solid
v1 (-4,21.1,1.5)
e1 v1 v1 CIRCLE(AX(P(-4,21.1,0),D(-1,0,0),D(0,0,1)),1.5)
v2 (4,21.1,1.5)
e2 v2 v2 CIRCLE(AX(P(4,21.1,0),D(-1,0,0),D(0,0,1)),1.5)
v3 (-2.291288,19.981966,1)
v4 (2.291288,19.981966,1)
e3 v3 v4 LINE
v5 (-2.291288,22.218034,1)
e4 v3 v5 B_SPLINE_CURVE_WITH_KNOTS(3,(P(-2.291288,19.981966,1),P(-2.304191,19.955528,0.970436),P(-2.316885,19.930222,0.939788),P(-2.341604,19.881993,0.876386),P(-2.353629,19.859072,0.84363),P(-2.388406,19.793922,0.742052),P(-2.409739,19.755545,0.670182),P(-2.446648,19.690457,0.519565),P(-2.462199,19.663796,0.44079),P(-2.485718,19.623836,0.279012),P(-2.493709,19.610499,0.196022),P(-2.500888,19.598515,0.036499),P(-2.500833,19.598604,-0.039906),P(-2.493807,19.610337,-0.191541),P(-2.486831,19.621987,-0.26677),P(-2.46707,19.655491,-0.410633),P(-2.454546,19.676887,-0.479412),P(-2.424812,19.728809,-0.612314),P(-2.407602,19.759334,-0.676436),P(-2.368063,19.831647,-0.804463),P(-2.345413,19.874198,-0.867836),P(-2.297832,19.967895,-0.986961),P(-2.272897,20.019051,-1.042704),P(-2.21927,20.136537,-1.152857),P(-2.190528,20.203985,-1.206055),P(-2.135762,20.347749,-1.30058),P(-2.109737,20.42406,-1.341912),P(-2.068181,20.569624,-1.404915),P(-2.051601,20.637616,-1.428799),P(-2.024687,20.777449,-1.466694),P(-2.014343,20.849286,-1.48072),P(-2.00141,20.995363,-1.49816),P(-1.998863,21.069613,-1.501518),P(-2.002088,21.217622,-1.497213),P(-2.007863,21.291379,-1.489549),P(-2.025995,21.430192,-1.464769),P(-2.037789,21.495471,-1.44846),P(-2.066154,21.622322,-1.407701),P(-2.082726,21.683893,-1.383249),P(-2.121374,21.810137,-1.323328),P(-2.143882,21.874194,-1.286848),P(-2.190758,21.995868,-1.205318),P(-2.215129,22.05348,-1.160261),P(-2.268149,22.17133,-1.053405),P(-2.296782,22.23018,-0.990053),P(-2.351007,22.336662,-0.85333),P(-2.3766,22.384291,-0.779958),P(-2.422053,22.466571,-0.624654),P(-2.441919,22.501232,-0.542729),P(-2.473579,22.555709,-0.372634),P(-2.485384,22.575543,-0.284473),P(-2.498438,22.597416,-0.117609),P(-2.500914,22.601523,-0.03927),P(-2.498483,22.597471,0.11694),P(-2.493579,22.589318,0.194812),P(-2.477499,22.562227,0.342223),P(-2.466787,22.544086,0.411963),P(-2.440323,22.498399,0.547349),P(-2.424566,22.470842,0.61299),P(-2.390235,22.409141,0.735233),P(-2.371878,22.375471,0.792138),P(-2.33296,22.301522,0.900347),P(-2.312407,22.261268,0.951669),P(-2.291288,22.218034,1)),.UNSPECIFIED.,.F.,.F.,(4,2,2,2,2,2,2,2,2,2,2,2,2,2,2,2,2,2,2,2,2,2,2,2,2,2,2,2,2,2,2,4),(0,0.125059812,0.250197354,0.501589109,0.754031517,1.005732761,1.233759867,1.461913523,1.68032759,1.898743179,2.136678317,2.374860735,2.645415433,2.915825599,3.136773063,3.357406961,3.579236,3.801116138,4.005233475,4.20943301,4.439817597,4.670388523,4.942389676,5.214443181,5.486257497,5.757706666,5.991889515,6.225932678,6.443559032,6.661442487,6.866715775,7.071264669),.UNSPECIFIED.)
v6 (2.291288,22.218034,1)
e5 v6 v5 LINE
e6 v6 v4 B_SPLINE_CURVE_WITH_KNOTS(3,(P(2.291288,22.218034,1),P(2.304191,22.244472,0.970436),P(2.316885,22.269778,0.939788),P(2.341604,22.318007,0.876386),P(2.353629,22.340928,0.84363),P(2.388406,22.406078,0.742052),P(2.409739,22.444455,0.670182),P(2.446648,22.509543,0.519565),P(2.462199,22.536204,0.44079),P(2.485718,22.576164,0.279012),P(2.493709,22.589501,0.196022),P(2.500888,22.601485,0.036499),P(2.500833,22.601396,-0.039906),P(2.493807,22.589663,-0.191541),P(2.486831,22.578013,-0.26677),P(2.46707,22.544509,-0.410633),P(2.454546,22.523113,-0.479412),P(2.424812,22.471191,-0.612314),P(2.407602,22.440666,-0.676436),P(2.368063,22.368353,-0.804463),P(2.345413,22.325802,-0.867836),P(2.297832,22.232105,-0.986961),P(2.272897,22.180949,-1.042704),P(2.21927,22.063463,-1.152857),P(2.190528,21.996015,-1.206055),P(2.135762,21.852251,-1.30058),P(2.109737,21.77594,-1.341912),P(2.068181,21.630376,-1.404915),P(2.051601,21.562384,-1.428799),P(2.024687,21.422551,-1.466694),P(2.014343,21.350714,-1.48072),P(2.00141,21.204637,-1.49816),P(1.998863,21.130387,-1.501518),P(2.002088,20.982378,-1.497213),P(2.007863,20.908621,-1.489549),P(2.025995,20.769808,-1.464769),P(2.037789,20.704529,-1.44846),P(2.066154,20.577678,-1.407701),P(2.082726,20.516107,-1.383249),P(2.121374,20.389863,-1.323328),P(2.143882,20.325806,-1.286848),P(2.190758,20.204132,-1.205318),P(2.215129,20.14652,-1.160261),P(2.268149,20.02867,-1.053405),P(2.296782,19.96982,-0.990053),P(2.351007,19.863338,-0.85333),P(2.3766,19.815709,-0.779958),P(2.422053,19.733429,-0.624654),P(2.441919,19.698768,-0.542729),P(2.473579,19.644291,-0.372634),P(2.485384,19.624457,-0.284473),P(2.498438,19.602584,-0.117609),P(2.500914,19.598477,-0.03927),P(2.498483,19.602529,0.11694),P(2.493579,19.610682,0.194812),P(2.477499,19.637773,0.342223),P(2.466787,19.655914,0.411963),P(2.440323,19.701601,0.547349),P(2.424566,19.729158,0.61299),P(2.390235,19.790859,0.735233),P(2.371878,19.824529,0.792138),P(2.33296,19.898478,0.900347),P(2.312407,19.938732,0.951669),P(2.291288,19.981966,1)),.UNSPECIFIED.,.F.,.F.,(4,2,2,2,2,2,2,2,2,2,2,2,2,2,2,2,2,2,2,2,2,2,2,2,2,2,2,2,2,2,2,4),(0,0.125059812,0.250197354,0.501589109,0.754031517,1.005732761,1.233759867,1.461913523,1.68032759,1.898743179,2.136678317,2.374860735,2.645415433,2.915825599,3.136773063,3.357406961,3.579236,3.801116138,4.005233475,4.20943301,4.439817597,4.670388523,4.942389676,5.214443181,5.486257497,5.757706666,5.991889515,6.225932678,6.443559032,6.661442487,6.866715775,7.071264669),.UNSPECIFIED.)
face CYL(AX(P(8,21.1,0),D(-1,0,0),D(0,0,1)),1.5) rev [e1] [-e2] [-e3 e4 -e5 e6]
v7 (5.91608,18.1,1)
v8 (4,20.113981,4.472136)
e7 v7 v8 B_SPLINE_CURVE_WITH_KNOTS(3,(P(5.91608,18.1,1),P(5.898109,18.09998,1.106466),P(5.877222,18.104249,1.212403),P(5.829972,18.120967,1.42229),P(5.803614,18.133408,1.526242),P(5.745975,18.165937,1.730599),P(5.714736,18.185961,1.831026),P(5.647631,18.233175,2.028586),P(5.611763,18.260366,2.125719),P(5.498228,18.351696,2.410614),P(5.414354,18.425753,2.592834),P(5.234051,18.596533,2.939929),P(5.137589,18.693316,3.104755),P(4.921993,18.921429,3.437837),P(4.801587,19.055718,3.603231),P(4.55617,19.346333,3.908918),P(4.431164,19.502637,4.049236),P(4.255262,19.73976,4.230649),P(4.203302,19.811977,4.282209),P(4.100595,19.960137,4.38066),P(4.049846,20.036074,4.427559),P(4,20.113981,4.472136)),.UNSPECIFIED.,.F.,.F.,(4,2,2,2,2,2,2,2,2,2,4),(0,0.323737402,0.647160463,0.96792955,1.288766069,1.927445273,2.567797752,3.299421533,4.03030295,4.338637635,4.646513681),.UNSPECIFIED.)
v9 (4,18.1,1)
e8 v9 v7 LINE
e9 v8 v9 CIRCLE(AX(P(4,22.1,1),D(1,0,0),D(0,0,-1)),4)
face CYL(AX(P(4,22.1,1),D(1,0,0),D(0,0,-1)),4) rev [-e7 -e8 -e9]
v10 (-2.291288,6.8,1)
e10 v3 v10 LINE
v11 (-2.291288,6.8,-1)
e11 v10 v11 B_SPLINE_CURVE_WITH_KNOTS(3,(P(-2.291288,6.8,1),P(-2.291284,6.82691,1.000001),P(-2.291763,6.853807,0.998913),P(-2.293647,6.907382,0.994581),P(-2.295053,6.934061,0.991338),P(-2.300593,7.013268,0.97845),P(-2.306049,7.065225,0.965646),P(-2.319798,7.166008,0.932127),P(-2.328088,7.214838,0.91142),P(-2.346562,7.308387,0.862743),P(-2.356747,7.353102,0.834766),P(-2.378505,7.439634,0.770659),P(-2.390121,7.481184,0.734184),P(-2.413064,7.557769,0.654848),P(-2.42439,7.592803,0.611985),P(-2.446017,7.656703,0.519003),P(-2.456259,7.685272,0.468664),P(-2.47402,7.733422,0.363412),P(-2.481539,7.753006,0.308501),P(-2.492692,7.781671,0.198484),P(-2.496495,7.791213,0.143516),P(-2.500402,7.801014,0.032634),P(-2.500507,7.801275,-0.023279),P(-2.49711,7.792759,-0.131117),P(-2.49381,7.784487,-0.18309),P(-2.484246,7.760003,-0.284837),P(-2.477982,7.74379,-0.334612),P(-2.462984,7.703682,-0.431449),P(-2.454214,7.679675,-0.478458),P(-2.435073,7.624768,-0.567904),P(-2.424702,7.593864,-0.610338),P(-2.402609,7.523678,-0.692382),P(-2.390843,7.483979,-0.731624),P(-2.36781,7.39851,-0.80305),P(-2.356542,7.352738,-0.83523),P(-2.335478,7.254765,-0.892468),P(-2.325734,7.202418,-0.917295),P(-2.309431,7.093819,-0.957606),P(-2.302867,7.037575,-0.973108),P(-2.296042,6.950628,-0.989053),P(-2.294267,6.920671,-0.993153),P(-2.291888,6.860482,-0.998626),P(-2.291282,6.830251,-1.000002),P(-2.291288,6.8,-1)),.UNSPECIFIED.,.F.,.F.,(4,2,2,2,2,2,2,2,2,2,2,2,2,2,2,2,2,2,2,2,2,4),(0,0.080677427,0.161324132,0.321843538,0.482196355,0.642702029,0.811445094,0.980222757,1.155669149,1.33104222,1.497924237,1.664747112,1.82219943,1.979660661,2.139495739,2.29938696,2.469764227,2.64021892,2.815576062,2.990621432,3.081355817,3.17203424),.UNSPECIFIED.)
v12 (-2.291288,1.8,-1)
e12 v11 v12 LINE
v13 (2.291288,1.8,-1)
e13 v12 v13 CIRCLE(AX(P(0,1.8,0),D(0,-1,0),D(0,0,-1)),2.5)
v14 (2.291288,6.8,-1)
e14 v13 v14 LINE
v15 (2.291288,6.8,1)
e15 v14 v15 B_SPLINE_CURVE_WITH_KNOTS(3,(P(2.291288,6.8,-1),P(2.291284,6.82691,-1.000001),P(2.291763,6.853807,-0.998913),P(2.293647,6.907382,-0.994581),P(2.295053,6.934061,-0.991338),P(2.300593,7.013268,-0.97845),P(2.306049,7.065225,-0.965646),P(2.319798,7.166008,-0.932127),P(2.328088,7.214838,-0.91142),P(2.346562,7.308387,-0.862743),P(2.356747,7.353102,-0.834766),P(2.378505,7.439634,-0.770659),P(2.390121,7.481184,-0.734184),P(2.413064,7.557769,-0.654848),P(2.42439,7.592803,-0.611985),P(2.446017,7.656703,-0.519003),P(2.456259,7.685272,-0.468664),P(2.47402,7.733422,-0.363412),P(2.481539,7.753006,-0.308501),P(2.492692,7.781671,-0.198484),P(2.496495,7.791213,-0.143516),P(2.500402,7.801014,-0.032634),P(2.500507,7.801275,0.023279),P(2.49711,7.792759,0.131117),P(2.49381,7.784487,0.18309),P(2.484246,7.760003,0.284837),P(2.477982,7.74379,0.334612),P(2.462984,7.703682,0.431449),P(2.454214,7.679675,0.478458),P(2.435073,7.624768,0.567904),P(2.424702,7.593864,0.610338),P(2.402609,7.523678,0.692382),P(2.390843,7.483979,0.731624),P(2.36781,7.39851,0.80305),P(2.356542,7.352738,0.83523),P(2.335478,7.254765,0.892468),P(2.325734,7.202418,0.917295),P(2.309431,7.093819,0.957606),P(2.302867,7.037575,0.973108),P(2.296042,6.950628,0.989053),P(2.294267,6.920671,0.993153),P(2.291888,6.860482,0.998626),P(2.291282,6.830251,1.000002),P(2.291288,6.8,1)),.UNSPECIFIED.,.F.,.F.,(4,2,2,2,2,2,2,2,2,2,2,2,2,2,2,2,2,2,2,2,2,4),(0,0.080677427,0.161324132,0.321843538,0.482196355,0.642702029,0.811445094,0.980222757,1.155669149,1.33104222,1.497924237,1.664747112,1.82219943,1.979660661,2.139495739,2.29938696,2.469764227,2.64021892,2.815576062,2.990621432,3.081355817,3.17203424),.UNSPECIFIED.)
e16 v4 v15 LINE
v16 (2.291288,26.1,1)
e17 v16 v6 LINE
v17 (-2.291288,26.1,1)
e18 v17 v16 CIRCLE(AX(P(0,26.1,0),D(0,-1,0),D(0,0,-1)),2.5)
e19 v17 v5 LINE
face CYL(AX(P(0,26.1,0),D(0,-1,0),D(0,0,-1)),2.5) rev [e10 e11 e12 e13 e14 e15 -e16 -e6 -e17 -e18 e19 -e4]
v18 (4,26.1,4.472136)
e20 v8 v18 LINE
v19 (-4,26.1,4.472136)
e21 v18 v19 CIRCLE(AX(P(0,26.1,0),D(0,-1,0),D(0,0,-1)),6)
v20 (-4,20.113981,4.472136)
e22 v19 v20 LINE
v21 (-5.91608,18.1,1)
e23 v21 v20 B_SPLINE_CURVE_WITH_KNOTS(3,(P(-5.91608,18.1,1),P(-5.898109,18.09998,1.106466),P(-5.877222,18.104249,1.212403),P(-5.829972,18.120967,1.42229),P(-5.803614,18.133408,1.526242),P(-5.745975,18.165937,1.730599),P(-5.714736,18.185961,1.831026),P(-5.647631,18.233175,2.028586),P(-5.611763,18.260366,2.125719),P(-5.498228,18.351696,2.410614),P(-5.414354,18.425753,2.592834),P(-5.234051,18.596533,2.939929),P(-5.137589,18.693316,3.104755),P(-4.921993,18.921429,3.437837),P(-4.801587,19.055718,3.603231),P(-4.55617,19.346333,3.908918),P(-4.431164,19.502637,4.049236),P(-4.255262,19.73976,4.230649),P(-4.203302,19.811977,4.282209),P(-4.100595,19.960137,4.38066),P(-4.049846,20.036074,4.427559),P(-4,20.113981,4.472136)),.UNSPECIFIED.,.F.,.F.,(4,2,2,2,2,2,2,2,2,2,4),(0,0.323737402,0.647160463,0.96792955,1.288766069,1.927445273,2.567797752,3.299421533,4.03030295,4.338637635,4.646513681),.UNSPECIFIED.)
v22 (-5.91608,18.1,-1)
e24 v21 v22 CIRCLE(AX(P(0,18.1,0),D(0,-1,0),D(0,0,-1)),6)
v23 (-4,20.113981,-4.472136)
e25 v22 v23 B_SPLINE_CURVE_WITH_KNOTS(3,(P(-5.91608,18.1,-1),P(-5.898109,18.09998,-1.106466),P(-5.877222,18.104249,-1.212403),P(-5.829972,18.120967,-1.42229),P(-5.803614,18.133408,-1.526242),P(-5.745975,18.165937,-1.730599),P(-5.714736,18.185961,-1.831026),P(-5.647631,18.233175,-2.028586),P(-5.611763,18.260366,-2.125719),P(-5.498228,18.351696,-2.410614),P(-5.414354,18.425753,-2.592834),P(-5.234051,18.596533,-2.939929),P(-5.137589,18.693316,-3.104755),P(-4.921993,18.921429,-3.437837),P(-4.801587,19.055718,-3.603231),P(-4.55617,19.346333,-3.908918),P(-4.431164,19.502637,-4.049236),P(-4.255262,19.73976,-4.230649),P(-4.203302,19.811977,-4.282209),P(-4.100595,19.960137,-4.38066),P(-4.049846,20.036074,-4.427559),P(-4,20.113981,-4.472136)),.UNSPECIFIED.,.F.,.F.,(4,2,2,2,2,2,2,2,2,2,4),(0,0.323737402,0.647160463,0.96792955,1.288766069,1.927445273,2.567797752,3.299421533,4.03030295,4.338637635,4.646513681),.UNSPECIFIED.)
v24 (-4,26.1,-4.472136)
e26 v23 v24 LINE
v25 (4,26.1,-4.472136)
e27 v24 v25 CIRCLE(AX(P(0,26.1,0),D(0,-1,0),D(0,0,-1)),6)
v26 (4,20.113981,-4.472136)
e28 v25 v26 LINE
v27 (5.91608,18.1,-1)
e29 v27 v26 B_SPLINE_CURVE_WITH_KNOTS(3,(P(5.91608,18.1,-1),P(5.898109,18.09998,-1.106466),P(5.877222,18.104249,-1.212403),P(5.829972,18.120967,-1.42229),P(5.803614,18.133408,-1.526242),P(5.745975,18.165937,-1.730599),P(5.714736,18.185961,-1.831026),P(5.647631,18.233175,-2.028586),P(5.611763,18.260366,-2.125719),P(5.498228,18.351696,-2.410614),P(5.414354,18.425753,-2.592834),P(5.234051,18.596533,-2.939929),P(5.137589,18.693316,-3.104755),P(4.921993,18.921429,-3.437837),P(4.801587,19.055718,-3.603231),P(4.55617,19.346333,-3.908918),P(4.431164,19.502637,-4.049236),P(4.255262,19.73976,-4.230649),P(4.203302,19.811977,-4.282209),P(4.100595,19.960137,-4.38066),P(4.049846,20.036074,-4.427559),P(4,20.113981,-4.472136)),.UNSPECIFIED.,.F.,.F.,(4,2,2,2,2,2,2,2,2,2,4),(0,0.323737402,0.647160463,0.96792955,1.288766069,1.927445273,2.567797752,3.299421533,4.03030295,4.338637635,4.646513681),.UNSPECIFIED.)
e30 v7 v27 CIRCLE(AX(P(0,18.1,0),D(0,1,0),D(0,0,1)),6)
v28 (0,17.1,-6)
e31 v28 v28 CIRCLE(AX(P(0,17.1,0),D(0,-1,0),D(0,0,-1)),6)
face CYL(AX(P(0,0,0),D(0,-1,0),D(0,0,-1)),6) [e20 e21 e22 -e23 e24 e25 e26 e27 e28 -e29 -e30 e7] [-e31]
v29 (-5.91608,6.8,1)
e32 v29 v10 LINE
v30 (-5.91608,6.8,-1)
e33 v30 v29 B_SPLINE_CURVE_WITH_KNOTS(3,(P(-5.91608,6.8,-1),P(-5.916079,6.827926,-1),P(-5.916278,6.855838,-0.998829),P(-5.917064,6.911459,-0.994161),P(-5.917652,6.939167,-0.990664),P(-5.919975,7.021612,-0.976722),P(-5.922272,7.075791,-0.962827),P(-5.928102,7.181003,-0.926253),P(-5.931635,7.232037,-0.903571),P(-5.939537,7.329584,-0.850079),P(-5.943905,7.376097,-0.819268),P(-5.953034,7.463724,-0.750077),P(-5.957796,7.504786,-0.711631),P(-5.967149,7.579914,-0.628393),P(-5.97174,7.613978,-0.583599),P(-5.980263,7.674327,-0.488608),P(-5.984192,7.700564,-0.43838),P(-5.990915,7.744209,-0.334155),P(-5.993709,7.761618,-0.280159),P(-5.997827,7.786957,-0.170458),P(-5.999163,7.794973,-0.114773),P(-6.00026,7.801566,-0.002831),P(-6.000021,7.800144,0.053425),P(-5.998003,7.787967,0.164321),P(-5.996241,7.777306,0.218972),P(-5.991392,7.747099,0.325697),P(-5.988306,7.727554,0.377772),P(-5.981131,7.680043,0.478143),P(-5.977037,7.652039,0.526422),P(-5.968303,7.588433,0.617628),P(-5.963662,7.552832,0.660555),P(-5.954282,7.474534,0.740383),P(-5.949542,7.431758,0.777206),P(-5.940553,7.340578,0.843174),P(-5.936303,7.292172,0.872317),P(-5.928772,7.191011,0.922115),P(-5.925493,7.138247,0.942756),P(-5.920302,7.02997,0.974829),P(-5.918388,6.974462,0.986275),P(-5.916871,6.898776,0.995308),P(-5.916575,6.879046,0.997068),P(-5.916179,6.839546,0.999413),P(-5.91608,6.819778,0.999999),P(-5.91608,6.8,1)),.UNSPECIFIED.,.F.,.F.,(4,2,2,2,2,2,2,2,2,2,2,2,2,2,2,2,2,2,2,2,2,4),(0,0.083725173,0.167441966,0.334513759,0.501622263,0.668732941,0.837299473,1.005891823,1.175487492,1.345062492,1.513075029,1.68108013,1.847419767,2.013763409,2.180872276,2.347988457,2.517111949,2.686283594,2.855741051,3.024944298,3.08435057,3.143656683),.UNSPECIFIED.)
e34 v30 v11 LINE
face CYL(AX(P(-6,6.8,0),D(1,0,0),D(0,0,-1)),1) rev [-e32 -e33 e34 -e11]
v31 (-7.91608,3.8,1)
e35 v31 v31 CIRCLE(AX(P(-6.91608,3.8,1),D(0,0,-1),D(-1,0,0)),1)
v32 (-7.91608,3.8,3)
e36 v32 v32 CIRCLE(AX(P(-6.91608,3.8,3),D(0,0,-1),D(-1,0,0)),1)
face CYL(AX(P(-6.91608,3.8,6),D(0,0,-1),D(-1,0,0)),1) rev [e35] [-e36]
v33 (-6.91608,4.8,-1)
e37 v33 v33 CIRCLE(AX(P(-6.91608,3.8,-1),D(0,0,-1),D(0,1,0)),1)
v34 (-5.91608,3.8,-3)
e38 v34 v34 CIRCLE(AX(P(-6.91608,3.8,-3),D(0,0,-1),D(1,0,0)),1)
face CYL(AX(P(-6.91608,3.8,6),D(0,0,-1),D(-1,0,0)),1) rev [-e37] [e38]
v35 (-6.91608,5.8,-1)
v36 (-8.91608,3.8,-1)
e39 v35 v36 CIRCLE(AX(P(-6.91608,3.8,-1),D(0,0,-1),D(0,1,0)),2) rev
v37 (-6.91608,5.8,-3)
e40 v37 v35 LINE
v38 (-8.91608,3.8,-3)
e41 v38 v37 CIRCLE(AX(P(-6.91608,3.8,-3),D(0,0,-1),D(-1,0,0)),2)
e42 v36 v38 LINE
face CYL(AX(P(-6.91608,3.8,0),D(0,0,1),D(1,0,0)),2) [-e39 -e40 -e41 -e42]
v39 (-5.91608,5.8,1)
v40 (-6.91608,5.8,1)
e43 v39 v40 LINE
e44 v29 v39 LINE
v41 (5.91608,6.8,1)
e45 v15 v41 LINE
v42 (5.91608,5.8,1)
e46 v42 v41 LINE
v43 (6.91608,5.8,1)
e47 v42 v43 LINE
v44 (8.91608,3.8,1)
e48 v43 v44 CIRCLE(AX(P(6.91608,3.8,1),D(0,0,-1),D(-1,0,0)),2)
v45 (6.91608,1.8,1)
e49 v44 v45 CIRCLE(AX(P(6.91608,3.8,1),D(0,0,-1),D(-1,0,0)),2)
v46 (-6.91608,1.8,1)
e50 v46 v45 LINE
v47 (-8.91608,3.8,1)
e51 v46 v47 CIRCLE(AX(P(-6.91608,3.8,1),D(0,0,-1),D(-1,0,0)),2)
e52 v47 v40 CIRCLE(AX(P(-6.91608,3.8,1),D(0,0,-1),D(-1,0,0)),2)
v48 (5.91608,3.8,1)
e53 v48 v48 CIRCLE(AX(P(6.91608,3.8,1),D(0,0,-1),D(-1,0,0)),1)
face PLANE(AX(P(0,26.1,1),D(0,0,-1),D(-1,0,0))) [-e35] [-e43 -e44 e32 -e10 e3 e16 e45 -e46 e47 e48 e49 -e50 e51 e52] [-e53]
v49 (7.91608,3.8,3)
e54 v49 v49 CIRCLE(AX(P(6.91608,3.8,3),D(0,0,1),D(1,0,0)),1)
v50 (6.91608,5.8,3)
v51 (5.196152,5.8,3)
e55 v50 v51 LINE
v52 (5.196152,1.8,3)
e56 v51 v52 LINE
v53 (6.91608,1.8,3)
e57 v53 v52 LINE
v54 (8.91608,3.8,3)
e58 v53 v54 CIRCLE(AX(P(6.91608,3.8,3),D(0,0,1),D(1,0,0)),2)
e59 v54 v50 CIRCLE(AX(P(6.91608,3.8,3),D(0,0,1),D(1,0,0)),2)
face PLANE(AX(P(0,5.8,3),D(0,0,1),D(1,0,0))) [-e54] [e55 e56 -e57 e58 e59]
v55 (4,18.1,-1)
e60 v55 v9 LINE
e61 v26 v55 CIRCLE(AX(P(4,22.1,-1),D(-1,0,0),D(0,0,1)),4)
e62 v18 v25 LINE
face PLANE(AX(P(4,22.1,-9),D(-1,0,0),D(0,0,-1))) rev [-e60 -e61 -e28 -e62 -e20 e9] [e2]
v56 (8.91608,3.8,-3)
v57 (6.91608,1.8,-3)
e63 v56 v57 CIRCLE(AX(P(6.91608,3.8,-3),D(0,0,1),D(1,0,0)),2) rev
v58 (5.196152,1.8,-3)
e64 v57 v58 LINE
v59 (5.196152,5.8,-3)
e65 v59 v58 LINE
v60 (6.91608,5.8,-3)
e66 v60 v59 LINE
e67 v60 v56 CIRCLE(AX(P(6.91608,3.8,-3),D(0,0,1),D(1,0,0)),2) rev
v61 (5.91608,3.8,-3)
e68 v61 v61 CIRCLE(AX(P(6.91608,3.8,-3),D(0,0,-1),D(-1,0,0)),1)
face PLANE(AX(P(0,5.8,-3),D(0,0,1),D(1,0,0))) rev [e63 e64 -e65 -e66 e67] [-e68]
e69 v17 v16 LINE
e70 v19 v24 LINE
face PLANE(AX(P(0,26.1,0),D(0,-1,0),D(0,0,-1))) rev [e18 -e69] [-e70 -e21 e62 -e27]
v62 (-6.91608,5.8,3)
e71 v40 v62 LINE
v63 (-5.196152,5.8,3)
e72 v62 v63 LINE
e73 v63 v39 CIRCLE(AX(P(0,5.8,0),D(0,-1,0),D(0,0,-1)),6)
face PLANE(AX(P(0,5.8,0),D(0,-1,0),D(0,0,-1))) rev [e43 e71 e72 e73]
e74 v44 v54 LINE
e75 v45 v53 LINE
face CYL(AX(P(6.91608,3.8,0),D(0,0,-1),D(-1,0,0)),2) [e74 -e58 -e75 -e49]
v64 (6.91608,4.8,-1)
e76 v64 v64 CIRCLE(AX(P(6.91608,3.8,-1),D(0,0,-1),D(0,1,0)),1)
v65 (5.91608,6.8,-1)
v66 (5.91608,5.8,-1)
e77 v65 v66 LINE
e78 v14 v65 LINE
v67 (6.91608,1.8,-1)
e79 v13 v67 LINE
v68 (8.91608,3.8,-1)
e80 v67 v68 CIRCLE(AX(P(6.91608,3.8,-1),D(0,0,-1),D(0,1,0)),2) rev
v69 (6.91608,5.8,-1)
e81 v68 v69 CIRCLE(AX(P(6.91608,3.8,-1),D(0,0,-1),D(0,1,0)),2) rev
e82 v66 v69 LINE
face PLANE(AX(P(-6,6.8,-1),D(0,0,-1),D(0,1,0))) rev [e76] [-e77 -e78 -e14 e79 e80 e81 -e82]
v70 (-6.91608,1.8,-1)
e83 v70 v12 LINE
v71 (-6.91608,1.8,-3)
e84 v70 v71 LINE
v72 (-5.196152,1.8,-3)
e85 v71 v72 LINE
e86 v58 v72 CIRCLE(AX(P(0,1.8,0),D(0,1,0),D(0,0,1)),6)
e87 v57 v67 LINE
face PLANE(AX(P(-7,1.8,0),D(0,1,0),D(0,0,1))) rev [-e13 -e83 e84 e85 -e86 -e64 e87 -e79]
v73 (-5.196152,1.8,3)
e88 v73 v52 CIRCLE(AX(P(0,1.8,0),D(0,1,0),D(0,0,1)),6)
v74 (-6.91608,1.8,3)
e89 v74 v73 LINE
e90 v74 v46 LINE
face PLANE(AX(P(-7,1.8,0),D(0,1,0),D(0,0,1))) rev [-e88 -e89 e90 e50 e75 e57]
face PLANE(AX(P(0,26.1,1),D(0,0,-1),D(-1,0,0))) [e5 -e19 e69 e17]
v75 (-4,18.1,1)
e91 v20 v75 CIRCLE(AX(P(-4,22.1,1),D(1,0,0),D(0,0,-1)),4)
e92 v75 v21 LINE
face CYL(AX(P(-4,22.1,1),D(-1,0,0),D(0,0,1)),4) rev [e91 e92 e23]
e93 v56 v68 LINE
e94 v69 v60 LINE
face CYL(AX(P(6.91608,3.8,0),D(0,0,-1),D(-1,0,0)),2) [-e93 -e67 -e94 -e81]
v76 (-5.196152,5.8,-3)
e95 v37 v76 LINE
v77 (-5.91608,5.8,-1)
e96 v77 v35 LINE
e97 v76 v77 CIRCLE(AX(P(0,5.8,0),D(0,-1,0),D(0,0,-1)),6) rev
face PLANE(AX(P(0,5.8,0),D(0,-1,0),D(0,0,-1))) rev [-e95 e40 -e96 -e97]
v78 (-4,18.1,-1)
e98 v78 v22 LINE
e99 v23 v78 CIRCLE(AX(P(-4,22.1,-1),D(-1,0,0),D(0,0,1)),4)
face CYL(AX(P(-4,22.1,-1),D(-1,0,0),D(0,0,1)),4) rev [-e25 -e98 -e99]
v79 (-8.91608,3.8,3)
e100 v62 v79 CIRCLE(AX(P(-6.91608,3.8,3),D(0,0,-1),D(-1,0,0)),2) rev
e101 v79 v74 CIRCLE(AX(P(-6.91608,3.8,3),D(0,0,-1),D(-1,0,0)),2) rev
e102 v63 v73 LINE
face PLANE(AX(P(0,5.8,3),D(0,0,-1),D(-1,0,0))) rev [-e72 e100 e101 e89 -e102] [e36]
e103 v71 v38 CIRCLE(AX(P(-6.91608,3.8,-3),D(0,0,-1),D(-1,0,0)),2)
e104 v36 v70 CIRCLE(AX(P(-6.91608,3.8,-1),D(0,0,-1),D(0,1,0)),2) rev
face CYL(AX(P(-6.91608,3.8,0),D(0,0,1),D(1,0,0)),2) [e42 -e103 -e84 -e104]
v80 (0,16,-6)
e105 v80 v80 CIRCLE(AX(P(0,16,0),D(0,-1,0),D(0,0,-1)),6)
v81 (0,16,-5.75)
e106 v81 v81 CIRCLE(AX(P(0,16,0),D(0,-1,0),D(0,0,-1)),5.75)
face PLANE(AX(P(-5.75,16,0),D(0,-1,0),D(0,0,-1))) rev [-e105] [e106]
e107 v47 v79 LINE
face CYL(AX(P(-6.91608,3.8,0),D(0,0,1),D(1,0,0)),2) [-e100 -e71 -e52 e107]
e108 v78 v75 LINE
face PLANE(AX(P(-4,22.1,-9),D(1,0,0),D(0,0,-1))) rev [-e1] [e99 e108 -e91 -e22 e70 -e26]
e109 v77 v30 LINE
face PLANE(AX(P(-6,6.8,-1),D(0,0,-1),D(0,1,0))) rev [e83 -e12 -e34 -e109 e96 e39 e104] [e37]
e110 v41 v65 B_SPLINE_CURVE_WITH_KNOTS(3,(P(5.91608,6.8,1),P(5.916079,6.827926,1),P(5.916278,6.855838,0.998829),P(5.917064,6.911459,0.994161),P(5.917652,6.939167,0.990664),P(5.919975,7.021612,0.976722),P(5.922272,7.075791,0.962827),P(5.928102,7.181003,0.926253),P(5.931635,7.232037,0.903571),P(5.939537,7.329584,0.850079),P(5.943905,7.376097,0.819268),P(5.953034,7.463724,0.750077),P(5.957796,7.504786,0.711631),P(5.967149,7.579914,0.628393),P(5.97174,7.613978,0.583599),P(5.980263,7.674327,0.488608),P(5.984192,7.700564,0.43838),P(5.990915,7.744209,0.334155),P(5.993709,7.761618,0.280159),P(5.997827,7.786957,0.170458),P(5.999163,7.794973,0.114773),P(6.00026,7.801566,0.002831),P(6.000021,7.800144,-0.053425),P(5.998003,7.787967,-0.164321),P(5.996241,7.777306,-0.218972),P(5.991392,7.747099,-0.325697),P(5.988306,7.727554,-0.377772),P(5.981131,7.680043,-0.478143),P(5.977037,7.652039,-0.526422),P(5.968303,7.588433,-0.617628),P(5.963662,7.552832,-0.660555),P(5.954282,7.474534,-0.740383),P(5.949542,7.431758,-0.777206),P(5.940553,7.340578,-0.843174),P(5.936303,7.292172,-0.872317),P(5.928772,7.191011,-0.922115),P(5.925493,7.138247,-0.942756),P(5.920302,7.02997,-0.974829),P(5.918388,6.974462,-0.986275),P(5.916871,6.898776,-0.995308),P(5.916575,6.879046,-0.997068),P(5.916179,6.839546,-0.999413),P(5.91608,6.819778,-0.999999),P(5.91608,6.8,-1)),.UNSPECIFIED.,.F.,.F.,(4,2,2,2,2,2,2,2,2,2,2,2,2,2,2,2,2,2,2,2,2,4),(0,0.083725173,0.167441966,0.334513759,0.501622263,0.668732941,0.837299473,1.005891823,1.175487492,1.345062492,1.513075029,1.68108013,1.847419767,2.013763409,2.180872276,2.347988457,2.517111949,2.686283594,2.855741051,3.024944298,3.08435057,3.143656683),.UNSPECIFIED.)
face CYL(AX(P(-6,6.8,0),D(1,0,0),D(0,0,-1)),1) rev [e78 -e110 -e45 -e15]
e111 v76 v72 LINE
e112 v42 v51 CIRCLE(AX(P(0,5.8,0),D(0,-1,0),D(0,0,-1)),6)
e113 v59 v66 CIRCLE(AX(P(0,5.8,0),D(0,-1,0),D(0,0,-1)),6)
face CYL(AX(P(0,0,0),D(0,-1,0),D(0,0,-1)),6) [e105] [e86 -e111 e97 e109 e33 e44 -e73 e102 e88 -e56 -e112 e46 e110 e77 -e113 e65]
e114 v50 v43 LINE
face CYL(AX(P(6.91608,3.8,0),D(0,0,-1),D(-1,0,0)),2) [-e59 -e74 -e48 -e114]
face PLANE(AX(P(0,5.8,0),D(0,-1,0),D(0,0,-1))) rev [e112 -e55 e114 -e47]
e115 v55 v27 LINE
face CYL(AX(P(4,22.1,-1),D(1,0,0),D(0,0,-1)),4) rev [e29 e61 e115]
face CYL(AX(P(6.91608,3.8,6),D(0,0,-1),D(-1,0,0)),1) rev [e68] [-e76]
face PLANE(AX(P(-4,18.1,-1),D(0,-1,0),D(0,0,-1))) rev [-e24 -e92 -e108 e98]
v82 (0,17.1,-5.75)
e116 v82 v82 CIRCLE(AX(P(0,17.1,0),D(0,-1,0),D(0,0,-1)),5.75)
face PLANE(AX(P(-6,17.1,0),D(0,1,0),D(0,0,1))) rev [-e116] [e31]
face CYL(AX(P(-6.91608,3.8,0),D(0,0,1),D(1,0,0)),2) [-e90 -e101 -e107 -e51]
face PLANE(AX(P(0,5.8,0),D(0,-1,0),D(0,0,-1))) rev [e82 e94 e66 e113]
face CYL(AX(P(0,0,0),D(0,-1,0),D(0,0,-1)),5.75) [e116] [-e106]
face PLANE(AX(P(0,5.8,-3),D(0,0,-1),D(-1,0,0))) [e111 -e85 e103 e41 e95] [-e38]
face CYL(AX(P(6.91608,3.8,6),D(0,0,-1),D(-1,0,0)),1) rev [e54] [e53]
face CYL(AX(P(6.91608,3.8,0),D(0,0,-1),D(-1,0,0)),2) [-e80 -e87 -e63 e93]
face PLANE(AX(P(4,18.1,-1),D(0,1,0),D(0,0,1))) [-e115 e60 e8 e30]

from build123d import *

# Parameters (mm, degrees)
CUT_EXTRUDE2_DEPTH  = 2
SKETCH4_R           = 1.5
CUT_EXTRUDE3_DEPTH  = 30.819624498
CUT_EXTRUDE4_DEPTH  = 27.804663864
CUT_EXTRUDE5_START  = -10
SKETCH6_R           = 8
SKETCH6_R_2         = 6
CUT_EXTRUDE5_DEPTH  = 10
CUT_EXTRUDE6_DEPTH  = 30.346379825
BOSS_EXTRUDE1_DEPTH = 4
SKETCH9_R           = 1
CUT_EXTRUDE7_DEPTH  = 30.012178231
FILLET1_R           = 2


with BuildPart() as part:
    # Sketch2 → Revolve1 (revolve)
    with BuildSketch(Plane.XY, mode=Mode.PRIVATE) as revolve1_sk:
        Polygon((0, 26.1), (-6, 26.1), (-6, 17.1), (-5.75, 17.1), (-5.75, 16), (-6, 16), (-6, 4), (-8, 4), (-8, 0), (-7, 0), (-7, 1.8), (0, 1.8), align=None)
    revolve(revolve1_sk.sketch.rotate(Axis((0, 0, 0), (0, 1, 0)), 270), axis=Axis((0, 0, 0), (0, 1, 0)))

    # Sketch3 → Cut-Extrude2 (cut)
    with BuildSketch(Plane.ZY.offset(6)):
        with BuildLine():
            Line((9, 26.1), (-9, 26.1))
            ThreePointArc((-9, 26.1), (-6.171572875, 24.928427125), (-5, 22.1))
            ThreePointArc((-5, 22.1), (-3.828427125, 19.271572875), (-1, 18.1))
            Line((-1, 18.1), (1, 18.1))
            ThreePointArc((1, 18.1), (3.828427125, 19.271572875), (5, 22.1))
            ThreePointArc((5, 22.1), (6.171572875, 24.928427125), (9, 26.1))
        make_face()
    cut_extrude2 = extrude(amount=-CUT_EXTRUDE2_DEPTH, mode=Mode.SUBTRACT)

    # Mirror1: Cut-Extrude2 across plane
    add(cut_extrude2.mirror(Plane(origin=(0, 0, 0), x_dir=(0, 0, 1), z_dir=(1, 0, 0))), mode=Mode.SUBTRACT)

    # Sketch4 → Cut-Extrude3 (cut, through all)
    with BuildSketch(Plane.ZY.offset(4)):
        with Locations((0, 21.1)):
            Circle(SKETCH4_R)
    extrude(amount=-CUT_EXTRUDE3_DEPTH, mode=Mode.SUBTRACT)

    # Sketch5 → Cut-Extrude4 (cut, through all)
    with BuildSketch(Plane.XZ.offset(-1.8)):
        with BuildLine():
            Line((2.291287847, 1), (-2.291287847, 1))
            ThreePointArc((-2.291287847, 1), (-0.510774109, -2.447265782), (2.5, 0))
            ThreePointArc((2.5, 0), (2.447265782, 0.510774109), (2.291287847, 1))
        make_face()
    extrude(amount=-CUT_EXTRUDE4_DEPTH, mode=Mode.SUBTRACT)

    # Sketch6 → Cut-Extrude5 (cut)
    with BuildSketch(Plane(origin=(0, 4, 0), x_dir=(1, 0, 0), z_dir=(0, 1, 0)).offset(CUT_EXTRUDE5_START)):
        Circle(SKETCH6_R)
        with Locations(Location((0, 0, 0), (0, 0, 90))):
            Circle(SKETCH6_R_2, mode=Mode.SUBTRACT)
    extrude(amount=CUT_EXTRUDE5_DEPTH, mode=Mode.SUBTRACT)

    # Sketch7 → Cut-Extrude6 (cut, through all)
    with BuildSketch(Plane(origin=(6, 0, 0), x_dir=(0, 0, -1), z_dir=(1, 0, 0))):
        with BuildLine():
            Line((-1, 1.8), (-1, 6.8))
            ThreePointArc((-1, 6.8), (0, 7.8), (1, 6.8))
            Line((1, 6.8), (1, 1.8))
            Line((1, 1.8), (-1, 1.8))
        make_face()
    extrude(amount=-CUT_EXTRUDE6_DEPTH, mode=Mode.SUBTRACT)

    # Sketch8 → Boss-Extrude1 (add)
    with BuildSketch(Plane.XZ.offset(-1.8)):
        with BuildLine():
            Line((-8.916079783, -3), (-5.196152423, -3))
            ThreePointArc((-5.196152423, -3), (-5.645389814, -2.032135293), (-5.916079783, -1))
            Line((-5.916079783, -1), (-8.916079783, -1))
            Line((-8.916079783, -1), (-8.916079783, -3))
        make_face()
        with BuildLine():
            ThreePointArc((-5.916079783, 1), (-5.645389814, 2.032135293), (-5.196152423, 3))
            Line((-5.196152423, 3), (-8.916079783, 3))
            Line((-8.916079783, 3), (-8.916079783, 1))
            Line((-8.916079783, 1), (-5.916079783, 1))
        make_face()
        with BuildLine():
            ThreePointArc((5.196152423, 3), (5.645389814, 2.032135293), (5.916079783, 1))
            Line((5.916079783, 1), (8.916079783, 1))
            Line((8.916079783, 1), (8.916079783, 3))
            Line((8.916079783, 3), (5.196152423, 3))
        make_face()
        with BuildLine():
            ThreePointArc((5.196152423, -3), (5.645389814, -2.032135293), (5.916079783, -1))
            Line((5.916079783, -1), (8.916079783, -1))
            Line((8.916079783, -1), (8.916079783, -3))
            Line((8.916079783, -3), (5.196152423, -3))
        make_face()
    extrude(amount=-BOSS_EXTRUDE1_DEPTH)

    # Sketch9 → Cut-Extrude7 (cut, through all)
    with BuildSketch(Plane(origin=(0, 0, -3), x_dir=(-1, 0, 0), z_dir=(0, 0, -1))):
        with Locations((-6.916079783, 3.8)):
            Circle(SKETCH9_R)
        with Locations((6.916079783, 3.8)):
            Circle(SKETCH9_R)
    extrude(amount=-CUT_EXTRUDE7_DEPTH, mode=Mode.SUBTRACT)

    # Fillet1
    fillet1_edges = [part.edges().sort_by_distance(p)[0] for p in [
        (-8.916079783, 5.8, 2),
        (-8.916079783, 1.8, 2),
        (-8.916079783, 1.8, -2),
        (-8.916079783, 5.8, -2),
        (8.916079783, 1.8, 2),
        (8.916079783, 5.8, 2),
        (8.916079783, 1.8, -2),
        (8.916079783, 5.8, -2),
    ]]
    fillet(fillet1_edges, radius=FILLET1_R - 0.0001)  # a hair under: the kernel refuses the full size


solid = part.part
